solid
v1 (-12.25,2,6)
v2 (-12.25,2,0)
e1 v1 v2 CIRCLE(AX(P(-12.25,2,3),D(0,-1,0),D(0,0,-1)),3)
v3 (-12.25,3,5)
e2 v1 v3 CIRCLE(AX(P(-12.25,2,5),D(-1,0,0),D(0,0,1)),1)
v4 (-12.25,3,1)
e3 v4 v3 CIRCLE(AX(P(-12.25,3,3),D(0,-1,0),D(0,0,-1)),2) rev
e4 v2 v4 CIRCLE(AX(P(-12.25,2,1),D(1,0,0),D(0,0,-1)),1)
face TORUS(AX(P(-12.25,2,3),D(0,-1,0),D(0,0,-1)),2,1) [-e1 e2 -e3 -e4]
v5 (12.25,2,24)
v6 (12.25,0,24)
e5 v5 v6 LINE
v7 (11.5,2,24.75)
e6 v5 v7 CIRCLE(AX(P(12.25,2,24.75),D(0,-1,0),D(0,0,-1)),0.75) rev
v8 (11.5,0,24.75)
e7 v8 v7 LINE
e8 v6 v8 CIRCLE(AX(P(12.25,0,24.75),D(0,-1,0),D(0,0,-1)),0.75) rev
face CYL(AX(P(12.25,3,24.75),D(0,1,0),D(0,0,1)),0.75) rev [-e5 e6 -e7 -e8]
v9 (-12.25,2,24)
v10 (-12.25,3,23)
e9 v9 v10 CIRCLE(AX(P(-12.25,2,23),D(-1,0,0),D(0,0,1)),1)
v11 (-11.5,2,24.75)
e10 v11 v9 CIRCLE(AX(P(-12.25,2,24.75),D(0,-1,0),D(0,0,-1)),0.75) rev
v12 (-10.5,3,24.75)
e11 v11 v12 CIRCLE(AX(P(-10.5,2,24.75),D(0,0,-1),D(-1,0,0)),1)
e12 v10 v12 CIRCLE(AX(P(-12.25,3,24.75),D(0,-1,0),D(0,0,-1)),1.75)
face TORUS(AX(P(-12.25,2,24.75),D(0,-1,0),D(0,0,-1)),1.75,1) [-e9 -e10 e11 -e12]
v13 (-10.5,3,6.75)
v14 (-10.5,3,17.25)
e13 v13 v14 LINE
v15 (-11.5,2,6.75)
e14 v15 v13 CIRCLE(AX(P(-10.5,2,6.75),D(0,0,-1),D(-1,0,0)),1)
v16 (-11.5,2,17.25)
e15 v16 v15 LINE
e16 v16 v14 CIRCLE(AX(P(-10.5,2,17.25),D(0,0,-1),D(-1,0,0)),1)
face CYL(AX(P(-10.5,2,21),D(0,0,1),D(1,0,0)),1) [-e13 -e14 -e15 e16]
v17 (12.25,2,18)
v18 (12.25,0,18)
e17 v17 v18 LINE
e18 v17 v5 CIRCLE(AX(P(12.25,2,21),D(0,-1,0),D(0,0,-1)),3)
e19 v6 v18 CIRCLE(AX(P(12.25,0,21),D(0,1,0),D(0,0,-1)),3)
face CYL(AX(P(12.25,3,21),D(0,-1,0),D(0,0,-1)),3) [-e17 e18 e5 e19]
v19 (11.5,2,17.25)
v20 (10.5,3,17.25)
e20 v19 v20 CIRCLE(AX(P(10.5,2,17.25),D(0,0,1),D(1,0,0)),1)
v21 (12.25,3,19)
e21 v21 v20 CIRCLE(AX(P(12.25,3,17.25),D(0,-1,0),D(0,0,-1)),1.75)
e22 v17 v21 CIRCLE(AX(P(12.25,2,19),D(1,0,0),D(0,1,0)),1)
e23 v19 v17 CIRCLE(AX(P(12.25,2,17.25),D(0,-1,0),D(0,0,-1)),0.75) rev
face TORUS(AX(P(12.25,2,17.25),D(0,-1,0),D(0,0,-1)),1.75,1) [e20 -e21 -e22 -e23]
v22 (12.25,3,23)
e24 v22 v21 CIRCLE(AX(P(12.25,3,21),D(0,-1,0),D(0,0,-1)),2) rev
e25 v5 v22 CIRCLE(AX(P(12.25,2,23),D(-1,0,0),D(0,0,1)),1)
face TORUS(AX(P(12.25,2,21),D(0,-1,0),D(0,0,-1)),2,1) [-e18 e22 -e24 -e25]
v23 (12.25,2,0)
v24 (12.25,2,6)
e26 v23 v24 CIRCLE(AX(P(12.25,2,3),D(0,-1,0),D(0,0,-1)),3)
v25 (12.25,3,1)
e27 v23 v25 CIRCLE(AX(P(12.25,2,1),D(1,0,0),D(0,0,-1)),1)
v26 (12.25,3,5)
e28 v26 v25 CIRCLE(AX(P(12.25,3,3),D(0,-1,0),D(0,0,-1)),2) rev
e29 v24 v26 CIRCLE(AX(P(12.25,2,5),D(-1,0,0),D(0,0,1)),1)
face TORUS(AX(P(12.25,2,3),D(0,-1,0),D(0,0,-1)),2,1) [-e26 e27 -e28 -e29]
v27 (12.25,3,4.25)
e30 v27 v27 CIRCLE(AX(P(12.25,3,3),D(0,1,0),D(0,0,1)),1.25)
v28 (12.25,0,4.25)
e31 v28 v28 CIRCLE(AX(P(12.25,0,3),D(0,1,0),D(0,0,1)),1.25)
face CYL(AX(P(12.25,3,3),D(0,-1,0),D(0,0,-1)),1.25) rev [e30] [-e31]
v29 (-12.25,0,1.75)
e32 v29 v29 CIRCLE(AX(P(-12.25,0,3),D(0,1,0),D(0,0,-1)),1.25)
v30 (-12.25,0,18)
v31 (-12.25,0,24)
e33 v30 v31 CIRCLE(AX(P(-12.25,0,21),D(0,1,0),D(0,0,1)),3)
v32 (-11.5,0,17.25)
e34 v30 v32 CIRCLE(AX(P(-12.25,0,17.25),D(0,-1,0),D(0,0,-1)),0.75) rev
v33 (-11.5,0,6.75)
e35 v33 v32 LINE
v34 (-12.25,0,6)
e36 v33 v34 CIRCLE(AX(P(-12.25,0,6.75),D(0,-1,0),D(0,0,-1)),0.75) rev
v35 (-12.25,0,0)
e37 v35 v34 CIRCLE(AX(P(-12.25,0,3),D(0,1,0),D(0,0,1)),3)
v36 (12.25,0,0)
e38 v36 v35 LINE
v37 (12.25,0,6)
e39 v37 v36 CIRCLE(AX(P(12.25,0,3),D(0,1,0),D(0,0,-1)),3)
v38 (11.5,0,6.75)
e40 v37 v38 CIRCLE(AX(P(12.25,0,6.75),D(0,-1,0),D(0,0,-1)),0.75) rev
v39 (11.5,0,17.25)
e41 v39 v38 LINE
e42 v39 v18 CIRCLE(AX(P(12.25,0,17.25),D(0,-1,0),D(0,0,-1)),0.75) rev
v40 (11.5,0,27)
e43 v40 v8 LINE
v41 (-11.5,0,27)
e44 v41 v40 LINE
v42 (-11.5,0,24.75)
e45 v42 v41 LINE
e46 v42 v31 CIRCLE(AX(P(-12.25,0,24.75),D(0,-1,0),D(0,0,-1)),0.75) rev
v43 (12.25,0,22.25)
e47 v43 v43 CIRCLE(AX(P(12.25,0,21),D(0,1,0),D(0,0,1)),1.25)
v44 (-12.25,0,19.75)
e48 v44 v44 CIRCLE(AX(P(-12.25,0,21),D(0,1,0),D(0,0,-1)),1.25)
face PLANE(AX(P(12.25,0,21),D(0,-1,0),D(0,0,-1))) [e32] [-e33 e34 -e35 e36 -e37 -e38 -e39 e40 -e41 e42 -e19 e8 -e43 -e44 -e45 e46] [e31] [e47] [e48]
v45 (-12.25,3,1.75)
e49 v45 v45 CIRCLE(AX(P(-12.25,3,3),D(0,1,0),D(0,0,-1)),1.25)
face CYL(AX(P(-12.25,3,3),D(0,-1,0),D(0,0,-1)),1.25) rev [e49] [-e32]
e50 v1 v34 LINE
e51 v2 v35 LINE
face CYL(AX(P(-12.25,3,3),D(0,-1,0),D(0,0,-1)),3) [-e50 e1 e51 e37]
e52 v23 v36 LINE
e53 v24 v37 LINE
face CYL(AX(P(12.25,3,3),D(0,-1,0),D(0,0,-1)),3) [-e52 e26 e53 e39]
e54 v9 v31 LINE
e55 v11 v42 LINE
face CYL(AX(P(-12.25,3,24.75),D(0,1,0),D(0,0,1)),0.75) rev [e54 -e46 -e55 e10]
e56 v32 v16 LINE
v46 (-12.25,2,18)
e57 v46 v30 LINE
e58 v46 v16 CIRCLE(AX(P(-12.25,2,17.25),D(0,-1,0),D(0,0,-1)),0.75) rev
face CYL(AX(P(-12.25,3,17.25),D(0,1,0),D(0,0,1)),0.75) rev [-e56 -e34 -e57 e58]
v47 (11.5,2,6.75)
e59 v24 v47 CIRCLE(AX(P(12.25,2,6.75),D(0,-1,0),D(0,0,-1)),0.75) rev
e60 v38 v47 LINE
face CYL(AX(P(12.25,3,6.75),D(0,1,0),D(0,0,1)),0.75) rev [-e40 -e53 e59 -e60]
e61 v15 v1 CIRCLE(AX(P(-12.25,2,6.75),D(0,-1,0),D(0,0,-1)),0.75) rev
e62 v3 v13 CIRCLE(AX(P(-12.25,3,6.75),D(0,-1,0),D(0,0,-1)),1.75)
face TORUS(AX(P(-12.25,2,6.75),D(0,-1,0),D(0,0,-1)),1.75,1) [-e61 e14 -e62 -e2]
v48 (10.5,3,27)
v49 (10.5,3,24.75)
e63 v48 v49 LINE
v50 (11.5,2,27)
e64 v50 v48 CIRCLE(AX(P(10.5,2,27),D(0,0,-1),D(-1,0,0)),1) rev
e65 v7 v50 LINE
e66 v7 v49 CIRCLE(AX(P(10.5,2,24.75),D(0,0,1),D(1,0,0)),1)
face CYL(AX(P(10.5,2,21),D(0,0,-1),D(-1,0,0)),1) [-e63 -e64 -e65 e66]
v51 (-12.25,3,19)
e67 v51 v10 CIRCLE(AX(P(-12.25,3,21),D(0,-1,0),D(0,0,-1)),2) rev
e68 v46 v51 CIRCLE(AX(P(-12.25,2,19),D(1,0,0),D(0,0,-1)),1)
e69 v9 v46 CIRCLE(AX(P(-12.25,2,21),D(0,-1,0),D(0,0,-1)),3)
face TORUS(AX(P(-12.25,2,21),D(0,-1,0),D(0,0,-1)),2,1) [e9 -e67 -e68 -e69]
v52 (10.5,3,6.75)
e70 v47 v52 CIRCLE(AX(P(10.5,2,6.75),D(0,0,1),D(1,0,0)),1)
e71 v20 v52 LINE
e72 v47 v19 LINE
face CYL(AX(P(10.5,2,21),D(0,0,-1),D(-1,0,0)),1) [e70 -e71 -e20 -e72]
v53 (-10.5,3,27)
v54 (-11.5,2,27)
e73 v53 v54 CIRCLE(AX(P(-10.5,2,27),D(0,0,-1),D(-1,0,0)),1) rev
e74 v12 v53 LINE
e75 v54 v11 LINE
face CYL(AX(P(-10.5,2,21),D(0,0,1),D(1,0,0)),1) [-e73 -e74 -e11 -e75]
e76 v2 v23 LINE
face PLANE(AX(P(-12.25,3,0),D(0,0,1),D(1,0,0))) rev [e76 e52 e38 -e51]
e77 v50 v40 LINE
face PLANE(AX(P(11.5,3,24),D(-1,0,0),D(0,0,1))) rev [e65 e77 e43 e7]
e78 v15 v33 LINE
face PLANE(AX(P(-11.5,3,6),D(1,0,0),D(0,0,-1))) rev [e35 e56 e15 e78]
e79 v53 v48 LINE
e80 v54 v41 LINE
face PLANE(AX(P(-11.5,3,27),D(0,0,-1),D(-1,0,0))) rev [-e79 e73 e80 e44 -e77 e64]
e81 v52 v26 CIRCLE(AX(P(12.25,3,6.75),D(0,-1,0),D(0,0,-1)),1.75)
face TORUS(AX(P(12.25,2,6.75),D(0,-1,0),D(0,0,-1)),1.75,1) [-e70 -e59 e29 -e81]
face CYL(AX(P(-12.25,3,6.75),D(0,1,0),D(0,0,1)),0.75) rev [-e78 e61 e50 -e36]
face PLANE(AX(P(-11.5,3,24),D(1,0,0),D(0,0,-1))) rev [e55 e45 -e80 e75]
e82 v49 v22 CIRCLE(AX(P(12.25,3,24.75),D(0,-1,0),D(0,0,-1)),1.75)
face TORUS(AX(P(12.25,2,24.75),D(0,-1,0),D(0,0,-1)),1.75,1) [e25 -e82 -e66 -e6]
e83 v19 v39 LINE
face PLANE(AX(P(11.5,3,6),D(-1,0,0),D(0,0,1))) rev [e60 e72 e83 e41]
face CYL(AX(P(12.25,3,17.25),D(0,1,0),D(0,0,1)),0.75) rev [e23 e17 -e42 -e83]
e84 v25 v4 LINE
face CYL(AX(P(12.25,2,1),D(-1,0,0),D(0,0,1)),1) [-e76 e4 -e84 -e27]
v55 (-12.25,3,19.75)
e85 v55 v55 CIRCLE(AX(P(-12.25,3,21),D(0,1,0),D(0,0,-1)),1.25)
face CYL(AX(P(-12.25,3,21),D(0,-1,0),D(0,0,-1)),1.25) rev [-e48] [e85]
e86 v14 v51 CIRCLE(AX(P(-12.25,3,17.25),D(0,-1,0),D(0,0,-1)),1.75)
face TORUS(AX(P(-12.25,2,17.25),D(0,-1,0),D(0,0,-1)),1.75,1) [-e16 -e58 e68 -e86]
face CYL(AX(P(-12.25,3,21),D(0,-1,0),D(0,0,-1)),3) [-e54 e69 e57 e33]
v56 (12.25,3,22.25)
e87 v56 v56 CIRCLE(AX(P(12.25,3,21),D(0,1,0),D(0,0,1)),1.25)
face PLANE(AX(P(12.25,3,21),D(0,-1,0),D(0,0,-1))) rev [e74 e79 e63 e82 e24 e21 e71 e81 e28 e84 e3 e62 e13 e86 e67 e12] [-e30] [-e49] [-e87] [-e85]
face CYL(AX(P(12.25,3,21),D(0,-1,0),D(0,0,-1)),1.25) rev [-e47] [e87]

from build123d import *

# Parameters (mm, degrees)
SKETCH3_R           = 1.25
BOSS_EXTRUDE1_DEPTH = 3
FILLET1_R           = 0.75
FILLET2_R           = 1


with BuildPart() as part:
    # Sketch3 → Boss-Extrude1 (new body)
    with BuildSketch(Plane(origin=(0, 0, 0), x_dir=(1, 0, 0), z_dir=(0, 1, 0))):
        with BuildLine():
            Line((-11.5, -24), (-11.5, -27))
            Line((-11.5, -27), (11.5, -27))
            Line((11.5, -27), (11.5, -24))
            Line((11.5, -24), (12.25, -24))
            ThreePointArc((12.25, -24), (15.25, -21), (12.25, -18))
            Line((12.25, -18), (11.5, -18))
            Line((11.5, -18), (11.5, -6))
            Line((11.5, -6), (12.25, -6))
            ThreePointArc((12.25, -6), (15.25, -3), (12.25, 0))
            Line((12.25, 0), (-12.25, 0))
            ThreePointArc((-12.25, 0), (-15.25, -3), (-12.25, -6))
            Line((-12.25, -6), (-11.5, -6))
            Line((-11.5, -6), (-11.5, -18))
            Line((-11.5, -18), (-12.25, -18))
            ThreePointArc((-12.25, -18), (-15.25, -21), (-12.25, -24))
            Line((-12.25, -24), (-11.5, -24))
        make_face()
        with Locations(Location((-12.25, -21, 0), (0, 0, 90))):
            Circle(SKETCH3_R, mode=Mode.SUBTRACT)
        with Locations(Location((-12.25, -3, 0), (0, 0, 90))):
            Circle(SKETCH3_R, mode=Mode.SUBTRACT)
        with Locations(Location((12.25, -3, 0), (0, 0, 270))):
            Circle(SKETCH3_R, mode=Mode.SUBTRACT)
        with Locations(Location((12.25, -21, 0), (0, 0, 270))):
            Circle(SKETCH3_R, mode=Mode.SUBTRACT)
    extrude(amount=BOSS_EXTRUDE1_DEPTH)

    # Fillet1
    fillet1_edges = [part.edges().sort_by_distance(p)[0] for p in [
        (-11.5, 1.5, 18),
        (-11.5, 1.5, 24),
        (-11.5, 1.5, 6),
        (11.5, 1.5, 6),
        (11.5, 1.5, 24),
        (11.5, 1.5, 18),
    ]]
    fillet(fillet1_edges, radius=FILLET1_R - 0.0001)  # a hair under: the kernel refuses the full size

    # Fillet2
    fillet2_edges = [part.edges().sort_by_distance(p)[0] for p in [
        (15.25, 3, 21),
        (15.25, 3, 3),
        (0, 3, 0),
        (-15.25, 3, 3),
        (-15.25, 3, 21),
        (-11.5, 3, 12),
        (-11.5, 3, 25.87495),
        (11.5, 3, 12),
        (-11.719640625, 3, 17.780359375),
        (-11.719640625, 3, 24.219640625),
        (-11.719640625, 3, 6.219640625),
        (11.719640625, 3, 6.219640625),
        (11.719640625, 3, 24.219640625),
        (11.719640625, 3, 17.780359375),
        (11.5, 3, 25.87495),
    ]]
    fillet(fillet2_edges, radius=FILLET2_R)


solid = part.part
